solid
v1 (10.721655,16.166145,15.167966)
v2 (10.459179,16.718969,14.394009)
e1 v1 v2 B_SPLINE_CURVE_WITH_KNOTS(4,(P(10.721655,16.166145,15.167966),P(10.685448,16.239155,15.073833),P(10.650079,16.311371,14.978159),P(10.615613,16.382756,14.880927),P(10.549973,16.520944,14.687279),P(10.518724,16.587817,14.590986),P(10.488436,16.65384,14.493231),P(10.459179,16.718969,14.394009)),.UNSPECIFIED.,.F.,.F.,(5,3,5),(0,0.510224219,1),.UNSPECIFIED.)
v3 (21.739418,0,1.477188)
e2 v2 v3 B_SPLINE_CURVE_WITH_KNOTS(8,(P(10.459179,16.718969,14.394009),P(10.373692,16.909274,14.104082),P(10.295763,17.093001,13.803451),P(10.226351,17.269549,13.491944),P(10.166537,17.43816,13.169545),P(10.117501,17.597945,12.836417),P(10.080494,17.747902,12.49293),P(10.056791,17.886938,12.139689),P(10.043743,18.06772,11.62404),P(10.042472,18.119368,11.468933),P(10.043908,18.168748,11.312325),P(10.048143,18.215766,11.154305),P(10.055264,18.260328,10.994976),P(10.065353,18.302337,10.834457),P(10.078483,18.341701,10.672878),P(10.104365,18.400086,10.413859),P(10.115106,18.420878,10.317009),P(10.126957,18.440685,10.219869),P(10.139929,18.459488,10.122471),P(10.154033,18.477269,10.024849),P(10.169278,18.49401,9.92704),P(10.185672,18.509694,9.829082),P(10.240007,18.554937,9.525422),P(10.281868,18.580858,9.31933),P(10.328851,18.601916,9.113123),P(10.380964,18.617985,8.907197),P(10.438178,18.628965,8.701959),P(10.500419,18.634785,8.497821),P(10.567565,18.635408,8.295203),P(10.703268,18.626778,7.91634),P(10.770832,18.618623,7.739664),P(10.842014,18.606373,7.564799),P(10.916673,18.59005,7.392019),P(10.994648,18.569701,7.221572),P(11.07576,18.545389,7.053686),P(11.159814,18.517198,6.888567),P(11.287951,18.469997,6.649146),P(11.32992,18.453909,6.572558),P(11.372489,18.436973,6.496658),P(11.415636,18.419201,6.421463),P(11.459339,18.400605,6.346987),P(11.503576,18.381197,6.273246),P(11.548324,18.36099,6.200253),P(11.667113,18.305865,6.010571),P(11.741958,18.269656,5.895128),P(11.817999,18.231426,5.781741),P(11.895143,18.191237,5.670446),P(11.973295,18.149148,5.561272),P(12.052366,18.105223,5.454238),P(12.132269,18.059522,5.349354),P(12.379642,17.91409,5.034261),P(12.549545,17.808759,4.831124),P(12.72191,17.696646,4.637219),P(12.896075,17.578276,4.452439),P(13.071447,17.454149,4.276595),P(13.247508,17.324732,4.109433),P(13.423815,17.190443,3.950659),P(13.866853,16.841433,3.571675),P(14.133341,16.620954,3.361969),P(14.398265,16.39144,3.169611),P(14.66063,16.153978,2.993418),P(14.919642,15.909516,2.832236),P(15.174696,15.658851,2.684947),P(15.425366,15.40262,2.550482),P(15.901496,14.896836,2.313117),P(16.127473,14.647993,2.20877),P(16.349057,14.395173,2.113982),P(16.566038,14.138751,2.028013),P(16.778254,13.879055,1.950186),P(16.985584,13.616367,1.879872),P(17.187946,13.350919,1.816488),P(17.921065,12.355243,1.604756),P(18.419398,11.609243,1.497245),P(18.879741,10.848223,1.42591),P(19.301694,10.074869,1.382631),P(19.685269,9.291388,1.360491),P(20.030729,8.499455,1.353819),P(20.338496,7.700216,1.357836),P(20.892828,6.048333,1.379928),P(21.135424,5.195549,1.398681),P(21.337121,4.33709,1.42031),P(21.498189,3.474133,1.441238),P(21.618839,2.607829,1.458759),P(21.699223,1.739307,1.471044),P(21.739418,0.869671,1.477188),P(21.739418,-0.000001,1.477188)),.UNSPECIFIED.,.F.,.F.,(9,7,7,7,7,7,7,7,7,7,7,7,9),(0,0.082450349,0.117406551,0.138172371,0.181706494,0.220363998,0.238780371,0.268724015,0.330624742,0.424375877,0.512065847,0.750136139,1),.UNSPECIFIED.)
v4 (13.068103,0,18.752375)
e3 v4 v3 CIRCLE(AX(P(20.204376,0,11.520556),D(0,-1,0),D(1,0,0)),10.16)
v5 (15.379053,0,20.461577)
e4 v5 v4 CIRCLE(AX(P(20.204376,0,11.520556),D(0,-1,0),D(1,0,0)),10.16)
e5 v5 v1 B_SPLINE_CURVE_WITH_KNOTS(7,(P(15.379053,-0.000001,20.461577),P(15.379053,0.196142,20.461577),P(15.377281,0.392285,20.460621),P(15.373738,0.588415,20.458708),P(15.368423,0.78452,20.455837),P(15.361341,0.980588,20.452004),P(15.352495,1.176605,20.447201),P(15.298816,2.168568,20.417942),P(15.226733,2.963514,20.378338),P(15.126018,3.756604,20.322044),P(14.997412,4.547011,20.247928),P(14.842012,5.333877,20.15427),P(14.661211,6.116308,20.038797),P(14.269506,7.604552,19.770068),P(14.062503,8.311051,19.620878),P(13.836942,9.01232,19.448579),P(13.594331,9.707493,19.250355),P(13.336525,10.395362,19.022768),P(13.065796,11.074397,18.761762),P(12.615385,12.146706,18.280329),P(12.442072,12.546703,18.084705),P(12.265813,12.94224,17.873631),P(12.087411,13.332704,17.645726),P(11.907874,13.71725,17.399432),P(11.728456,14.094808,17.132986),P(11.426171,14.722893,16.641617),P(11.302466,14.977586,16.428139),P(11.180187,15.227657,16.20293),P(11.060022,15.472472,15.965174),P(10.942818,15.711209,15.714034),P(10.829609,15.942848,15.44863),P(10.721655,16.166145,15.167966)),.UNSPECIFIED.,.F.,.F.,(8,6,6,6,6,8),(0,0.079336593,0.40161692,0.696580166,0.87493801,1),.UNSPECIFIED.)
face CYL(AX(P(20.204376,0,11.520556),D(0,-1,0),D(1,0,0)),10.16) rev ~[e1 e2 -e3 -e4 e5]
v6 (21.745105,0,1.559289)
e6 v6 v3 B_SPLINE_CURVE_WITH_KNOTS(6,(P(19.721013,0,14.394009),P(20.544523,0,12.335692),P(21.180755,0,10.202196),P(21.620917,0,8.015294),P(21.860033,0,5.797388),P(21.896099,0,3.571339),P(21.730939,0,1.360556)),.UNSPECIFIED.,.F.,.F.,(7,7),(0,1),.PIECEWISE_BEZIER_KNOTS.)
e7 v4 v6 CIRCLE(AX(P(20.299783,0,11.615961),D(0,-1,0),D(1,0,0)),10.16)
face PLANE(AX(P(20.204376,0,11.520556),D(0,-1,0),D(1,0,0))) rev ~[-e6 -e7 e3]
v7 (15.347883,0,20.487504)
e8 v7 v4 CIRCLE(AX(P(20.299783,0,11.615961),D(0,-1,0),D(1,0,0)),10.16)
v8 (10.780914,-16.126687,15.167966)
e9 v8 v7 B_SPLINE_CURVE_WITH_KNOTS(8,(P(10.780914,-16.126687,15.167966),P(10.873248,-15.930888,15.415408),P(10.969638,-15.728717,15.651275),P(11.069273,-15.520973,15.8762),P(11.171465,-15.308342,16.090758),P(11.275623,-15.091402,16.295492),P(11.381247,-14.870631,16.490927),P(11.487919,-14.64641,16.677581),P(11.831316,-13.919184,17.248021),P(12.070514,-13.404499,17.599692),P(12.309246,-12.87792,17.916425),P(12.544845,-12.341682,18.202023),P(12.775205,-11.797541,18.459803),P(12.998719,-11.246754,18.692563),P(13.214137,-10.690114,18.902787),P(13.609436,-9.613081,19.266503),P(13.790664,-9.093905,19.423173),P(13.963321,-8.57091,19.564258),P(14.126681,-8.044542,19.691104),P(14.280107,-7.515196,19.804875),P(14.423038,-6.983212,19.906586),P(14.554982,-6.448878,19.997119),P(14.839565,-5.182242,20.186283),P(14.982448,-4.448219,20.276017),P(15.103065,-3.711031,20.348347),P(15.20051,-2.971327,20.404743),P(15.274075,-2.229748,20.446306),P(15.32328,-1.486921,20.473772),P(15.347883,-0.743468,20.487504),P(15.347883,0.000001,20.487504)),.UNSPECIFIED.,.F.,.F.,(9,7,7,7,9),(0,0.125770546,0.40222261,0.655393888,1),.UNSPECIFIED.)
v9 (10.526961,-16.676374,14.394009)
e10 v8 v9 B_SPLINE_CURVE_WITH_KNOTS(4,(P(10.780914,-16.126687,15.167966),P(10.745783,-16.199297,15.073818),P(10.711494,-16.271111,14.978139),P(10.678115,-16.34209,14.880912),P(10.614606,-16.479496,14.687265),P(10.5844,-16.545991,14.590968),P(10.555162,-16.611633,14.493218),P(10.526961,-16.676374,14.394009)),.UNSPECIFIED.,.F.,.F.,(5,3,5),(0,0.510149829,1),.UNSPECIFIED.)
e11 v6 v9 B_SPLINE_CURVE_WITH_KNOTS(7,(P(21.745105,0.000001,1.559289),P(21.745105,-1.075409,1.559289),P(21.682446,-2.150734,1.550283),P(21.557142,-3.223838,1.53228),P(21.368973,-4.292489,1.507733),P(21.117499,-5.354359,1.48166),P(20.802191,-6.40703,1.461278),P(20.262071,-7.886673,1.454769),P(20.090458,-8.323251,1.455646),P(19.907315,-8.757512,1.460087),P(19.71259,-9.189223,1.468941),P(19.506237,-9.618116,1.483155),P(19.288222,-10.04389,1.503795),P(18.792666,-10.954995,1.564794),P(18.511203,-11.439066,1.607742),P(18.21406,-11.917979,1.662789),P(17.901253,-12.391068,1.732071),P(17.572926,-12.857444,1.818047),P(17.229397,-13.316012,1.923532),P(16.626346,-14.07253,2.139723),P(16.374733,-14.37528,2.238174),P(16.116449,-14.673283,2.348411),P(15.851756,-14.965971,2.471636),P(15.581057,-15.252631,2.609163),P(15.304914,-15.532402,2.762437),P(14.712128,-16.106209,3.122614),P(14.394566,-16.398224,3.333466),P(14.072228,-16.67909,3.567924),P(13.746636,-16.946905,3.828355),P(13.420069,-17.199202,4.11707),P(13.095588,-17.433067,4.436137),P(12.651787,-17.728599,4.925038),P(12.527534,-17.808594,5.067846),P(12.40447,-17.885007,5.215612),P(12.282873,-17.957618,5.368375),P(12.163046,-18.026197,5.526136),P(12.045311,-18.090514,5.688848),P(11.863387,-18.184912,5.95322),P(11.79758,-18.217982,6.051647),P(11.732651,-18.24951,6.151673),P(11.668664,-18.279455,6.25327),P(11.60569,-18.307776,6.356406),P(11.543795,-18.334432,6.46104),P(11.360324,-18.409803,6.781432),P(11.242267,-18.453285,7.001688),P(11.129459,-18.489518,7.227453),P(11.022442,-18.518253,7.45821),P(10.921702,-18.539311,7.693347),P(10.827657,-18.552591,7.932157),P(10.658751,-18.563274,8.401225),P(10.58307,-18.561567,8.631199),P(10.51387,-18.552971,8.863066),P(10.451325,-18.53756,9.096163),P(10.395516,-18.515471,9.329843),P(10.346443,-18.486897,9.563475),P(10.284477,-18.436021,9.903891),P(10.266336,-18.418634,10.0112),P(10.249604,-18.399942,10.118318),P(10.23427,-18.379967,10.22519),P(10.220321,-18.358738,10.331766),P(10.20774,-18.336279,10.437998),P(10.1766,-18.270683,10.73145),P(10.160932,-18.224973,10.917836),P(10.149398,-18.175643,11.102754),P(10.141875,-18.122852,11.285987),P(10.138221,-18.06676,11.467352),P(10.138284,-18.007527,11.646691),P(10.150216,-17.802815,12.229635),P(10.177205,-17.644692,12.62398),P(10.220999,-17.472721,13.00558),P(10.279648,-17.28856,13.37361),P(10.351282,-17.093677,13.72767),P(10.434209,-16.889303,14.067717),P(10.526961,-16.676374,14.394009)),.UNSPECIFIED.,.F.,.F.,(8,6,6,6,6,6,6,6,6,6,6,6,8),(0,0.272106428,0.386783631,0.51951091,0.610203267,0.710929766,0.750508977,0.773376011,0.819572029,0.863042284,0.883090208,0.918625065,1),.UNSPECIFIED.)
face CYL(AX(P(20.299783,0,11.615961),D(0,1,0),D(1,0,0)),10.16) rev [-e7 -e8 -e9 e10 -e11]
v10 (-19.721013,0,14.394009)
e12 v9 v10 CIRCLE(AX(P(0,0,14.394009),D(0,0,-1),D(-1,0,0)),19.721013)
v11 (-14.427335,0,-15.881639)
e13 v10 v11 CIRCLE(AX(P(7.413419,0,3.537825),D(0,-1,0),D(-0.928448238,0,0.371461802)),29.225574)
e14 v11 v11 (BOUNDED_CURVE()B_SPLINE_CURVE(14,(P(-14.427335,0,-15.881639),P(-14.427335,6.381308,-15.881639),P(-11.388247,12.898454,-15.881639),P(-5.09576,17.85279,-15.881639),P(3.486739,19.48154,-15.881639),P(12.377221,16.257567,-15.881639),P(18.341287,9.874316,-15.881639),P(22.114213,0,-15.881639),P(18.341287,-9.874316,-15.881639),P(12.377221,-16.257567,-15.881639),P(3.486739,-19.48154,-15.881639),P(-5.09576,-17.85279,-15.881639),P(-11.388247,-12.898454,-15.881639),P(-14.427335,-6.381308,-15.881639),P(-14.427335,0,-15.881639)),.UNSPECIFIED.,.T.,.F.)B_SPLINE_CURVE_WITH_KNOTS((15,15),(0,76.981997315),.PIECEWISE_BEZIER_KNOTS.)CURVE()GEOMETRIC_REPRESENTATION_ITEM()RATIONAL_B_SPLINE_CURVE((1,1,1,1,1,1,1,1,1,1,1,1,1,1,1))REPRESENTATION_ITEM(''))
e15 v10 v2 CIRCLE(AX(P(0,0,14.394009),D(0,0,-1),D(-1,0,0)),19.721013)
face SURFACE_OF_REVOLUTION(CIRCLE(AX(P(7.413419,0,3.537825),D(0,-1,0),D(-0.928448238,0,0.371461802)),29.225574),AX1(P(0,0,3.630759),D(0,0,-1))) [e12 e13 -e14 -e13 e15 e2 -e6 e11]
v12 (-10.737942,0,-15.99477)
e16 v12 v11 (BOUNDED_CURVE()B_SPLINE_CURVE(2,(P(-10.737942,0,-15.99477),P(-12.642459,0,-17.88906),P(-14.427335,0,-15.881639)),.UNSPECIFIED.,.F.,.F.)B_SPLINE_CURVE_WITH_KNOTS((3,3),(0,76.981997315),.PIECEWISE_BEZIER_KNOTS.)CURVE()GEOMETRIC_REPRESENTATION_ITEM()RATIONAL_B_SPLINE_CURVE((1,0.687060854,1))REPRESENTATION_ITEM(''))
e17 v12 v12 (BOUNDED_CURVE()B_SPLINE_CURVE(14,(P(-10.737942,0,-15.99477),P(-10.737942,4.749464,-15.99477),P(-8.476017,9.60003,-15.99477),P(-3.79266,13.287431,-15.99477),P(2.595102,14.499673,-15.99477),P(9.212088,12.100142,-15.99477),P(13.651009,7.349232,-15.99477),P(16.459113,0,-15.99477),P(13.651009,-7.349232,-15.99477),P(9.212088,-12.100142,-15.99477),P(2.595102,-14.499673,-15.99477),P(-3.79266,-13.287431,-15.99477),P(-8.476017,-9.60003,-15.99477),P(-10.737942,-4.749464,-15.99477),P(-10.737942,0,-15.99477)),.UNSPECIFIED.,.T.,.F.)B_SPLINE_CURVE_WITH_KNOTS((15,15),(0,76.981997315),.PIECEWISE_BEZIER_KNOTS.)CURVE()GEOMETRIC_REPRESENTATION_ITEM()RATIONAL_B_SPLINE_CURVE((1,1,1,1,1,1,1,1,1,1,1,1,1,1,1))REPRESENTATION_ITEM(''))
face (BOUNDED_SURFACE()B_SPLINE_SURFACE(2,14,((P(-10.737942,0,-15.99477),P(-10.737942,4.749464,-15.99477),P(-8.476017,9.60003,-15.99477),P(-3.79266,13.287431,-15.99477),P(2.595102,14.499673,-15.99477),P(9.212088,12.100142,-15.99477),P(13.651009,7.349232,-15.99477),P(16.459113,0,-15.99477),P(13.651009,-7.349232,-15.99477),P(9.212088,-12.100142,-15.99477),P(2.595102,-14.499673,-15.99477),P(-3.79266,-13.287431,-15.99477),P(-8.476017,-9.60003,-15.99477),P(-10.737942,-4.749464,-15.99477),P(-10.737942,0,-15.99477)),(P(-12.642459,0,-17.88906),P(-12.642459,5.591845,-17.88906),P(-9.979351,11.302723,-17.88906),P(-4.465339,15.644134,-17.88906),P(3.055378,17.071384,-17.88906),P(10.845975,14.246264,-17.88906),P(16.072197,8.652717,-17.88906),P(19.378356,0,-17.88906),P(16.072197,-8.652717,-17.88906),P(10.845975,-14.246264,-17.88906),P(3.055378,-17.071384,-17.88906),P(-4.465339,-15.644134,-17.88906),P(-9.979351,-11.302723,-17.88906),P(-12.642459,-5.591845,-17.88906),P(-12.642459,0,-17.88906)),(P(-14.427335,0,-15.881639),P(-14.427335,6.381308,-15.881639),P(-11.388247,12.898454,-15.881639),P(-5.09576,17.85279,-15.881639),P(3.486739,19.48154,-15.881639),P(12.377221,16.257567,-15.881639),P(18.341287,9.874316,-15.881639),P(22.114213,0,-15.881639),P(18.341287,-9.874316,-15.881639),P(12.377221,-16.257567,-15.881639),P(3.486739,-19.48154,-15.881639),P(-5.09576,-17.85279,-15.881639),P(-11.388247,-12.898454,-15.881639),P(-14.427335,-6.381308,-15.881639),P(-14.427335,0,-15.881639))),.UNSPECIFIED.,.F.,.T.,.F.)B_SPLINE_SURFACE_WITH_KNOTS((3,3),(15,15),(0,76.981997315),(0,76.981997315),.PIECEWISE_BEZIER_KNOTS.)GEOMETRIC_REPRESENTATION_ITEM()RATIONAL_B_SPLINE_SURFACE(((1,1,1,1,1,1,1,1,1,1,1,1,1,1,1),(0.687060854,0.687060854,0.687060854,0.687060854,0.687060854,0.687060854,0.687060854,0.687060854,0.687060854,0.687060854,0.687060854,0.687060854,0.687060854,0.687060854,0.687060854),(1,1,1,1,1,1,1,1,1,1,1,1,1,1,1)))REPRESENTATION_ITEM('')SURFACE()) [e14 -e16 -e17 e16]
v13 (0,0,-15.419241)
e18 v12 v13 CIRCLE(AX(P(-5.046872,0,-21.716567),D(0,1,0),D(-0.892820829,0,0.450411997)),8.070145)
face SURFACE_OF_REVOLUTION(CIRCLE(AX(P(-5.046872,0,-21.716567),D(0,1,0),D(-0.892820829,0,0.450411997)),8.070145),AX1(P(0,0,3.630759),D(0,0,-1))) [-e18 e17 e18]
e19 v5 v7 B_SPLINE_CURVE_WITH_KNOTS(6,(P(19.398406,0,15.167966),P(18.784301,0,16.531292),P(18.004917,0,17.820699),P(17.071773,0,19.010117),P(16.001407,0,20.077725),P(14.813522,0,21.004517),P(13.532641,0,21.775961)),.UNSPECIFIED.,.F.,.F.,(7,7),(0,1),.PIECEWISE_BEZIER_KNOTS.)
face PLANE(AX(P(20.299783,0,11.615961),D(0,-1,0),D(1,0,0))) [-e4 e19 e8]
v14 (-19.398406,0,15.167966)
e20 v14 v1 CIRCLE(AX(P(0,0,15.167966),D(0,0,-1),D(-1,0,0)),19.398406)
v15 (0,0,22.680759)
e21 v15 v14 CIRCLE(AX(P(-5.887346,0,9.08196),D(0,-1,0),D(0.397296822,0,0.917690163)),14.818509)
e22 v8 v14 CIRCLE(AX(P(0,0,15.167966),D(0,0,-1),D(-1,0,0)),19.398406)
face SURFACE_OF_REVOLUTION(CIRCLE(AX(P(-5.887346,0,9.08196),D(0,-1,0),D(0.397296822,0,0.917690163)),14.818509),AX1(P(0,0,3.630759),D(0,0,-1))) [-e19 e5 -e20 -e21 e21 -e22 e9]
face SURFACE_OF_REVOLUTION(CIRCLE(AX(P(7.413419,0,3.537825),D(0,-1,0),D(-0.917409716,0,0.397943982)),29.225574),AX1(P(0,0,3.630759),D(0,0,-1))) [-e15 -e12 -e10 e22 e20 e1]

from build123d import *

# Parameters (mm, degrees)
F2_R     = 10.16
F3_DEPTH = 21.8131542984
F4_R     = 2.54
F5_R     = 10.16
F6_DEPTH = 21.8131542984


# Not quite as in the source:
# - a feature names something its author has since deleted; it is built from what else it names


with BuildPart() as f1:
    # F0 (on Front) → F1 (revolve)
    with BuildSketch(Plane.XZ):
        with BuildLine():
            ThreePointArc((-12.2520654017, -18.0816771193), (-6.7605609497, -13.8304712842), (0, -15.4192405701))
            Line((0, -15.4192405701), (0, 22.6807594299))
            ThreePointArc((0, 22.6807594299), (-11.239053287, 22.9003327562), (-19.3984057777, 15.1679658374))
            ThreePointArc((-19.3984057777, 15.1679658374), (-19.5624851514, 14.7821444157), (-19.7210129028, 14.394008921))
            ThreePointArc((-19.7210129028, 14.394008921), (-21.0686031127, -3.0126367804), (-12.2520654017, -18.0816771193))
        make_face()
    revolve(axis=Axis((0, 0, 3.6307594299), (0, 0, -1)))

    # F2 (on Front) → F3 (cut, through all)
    with BuildSketch(Plane.XZ):
        with Locations((20.2043764293, 11.5205561742)):
            Circle(F2_R)
    extrude(amount=-F3_DEPTH, mode=Mode.SUBTRACT)

    # F4
    f4_edges = [f1.edges().sort_by_distance(p)[0] for p in [
        (12.252065, 0, -18.081677),
    ]]
    fillet(f4_edges, radius=F4_R)

    # F5 (on Front) → F6 (cut, through all)
    with BuildSketch(Plane.XZ):
        with Locations((20.2997829765, 11.6159608588)):
            Circle(F5_R)
    extrude(amount=F6_DEPTH, mode=Mode.SUBTRACT)


solid = f1.part
